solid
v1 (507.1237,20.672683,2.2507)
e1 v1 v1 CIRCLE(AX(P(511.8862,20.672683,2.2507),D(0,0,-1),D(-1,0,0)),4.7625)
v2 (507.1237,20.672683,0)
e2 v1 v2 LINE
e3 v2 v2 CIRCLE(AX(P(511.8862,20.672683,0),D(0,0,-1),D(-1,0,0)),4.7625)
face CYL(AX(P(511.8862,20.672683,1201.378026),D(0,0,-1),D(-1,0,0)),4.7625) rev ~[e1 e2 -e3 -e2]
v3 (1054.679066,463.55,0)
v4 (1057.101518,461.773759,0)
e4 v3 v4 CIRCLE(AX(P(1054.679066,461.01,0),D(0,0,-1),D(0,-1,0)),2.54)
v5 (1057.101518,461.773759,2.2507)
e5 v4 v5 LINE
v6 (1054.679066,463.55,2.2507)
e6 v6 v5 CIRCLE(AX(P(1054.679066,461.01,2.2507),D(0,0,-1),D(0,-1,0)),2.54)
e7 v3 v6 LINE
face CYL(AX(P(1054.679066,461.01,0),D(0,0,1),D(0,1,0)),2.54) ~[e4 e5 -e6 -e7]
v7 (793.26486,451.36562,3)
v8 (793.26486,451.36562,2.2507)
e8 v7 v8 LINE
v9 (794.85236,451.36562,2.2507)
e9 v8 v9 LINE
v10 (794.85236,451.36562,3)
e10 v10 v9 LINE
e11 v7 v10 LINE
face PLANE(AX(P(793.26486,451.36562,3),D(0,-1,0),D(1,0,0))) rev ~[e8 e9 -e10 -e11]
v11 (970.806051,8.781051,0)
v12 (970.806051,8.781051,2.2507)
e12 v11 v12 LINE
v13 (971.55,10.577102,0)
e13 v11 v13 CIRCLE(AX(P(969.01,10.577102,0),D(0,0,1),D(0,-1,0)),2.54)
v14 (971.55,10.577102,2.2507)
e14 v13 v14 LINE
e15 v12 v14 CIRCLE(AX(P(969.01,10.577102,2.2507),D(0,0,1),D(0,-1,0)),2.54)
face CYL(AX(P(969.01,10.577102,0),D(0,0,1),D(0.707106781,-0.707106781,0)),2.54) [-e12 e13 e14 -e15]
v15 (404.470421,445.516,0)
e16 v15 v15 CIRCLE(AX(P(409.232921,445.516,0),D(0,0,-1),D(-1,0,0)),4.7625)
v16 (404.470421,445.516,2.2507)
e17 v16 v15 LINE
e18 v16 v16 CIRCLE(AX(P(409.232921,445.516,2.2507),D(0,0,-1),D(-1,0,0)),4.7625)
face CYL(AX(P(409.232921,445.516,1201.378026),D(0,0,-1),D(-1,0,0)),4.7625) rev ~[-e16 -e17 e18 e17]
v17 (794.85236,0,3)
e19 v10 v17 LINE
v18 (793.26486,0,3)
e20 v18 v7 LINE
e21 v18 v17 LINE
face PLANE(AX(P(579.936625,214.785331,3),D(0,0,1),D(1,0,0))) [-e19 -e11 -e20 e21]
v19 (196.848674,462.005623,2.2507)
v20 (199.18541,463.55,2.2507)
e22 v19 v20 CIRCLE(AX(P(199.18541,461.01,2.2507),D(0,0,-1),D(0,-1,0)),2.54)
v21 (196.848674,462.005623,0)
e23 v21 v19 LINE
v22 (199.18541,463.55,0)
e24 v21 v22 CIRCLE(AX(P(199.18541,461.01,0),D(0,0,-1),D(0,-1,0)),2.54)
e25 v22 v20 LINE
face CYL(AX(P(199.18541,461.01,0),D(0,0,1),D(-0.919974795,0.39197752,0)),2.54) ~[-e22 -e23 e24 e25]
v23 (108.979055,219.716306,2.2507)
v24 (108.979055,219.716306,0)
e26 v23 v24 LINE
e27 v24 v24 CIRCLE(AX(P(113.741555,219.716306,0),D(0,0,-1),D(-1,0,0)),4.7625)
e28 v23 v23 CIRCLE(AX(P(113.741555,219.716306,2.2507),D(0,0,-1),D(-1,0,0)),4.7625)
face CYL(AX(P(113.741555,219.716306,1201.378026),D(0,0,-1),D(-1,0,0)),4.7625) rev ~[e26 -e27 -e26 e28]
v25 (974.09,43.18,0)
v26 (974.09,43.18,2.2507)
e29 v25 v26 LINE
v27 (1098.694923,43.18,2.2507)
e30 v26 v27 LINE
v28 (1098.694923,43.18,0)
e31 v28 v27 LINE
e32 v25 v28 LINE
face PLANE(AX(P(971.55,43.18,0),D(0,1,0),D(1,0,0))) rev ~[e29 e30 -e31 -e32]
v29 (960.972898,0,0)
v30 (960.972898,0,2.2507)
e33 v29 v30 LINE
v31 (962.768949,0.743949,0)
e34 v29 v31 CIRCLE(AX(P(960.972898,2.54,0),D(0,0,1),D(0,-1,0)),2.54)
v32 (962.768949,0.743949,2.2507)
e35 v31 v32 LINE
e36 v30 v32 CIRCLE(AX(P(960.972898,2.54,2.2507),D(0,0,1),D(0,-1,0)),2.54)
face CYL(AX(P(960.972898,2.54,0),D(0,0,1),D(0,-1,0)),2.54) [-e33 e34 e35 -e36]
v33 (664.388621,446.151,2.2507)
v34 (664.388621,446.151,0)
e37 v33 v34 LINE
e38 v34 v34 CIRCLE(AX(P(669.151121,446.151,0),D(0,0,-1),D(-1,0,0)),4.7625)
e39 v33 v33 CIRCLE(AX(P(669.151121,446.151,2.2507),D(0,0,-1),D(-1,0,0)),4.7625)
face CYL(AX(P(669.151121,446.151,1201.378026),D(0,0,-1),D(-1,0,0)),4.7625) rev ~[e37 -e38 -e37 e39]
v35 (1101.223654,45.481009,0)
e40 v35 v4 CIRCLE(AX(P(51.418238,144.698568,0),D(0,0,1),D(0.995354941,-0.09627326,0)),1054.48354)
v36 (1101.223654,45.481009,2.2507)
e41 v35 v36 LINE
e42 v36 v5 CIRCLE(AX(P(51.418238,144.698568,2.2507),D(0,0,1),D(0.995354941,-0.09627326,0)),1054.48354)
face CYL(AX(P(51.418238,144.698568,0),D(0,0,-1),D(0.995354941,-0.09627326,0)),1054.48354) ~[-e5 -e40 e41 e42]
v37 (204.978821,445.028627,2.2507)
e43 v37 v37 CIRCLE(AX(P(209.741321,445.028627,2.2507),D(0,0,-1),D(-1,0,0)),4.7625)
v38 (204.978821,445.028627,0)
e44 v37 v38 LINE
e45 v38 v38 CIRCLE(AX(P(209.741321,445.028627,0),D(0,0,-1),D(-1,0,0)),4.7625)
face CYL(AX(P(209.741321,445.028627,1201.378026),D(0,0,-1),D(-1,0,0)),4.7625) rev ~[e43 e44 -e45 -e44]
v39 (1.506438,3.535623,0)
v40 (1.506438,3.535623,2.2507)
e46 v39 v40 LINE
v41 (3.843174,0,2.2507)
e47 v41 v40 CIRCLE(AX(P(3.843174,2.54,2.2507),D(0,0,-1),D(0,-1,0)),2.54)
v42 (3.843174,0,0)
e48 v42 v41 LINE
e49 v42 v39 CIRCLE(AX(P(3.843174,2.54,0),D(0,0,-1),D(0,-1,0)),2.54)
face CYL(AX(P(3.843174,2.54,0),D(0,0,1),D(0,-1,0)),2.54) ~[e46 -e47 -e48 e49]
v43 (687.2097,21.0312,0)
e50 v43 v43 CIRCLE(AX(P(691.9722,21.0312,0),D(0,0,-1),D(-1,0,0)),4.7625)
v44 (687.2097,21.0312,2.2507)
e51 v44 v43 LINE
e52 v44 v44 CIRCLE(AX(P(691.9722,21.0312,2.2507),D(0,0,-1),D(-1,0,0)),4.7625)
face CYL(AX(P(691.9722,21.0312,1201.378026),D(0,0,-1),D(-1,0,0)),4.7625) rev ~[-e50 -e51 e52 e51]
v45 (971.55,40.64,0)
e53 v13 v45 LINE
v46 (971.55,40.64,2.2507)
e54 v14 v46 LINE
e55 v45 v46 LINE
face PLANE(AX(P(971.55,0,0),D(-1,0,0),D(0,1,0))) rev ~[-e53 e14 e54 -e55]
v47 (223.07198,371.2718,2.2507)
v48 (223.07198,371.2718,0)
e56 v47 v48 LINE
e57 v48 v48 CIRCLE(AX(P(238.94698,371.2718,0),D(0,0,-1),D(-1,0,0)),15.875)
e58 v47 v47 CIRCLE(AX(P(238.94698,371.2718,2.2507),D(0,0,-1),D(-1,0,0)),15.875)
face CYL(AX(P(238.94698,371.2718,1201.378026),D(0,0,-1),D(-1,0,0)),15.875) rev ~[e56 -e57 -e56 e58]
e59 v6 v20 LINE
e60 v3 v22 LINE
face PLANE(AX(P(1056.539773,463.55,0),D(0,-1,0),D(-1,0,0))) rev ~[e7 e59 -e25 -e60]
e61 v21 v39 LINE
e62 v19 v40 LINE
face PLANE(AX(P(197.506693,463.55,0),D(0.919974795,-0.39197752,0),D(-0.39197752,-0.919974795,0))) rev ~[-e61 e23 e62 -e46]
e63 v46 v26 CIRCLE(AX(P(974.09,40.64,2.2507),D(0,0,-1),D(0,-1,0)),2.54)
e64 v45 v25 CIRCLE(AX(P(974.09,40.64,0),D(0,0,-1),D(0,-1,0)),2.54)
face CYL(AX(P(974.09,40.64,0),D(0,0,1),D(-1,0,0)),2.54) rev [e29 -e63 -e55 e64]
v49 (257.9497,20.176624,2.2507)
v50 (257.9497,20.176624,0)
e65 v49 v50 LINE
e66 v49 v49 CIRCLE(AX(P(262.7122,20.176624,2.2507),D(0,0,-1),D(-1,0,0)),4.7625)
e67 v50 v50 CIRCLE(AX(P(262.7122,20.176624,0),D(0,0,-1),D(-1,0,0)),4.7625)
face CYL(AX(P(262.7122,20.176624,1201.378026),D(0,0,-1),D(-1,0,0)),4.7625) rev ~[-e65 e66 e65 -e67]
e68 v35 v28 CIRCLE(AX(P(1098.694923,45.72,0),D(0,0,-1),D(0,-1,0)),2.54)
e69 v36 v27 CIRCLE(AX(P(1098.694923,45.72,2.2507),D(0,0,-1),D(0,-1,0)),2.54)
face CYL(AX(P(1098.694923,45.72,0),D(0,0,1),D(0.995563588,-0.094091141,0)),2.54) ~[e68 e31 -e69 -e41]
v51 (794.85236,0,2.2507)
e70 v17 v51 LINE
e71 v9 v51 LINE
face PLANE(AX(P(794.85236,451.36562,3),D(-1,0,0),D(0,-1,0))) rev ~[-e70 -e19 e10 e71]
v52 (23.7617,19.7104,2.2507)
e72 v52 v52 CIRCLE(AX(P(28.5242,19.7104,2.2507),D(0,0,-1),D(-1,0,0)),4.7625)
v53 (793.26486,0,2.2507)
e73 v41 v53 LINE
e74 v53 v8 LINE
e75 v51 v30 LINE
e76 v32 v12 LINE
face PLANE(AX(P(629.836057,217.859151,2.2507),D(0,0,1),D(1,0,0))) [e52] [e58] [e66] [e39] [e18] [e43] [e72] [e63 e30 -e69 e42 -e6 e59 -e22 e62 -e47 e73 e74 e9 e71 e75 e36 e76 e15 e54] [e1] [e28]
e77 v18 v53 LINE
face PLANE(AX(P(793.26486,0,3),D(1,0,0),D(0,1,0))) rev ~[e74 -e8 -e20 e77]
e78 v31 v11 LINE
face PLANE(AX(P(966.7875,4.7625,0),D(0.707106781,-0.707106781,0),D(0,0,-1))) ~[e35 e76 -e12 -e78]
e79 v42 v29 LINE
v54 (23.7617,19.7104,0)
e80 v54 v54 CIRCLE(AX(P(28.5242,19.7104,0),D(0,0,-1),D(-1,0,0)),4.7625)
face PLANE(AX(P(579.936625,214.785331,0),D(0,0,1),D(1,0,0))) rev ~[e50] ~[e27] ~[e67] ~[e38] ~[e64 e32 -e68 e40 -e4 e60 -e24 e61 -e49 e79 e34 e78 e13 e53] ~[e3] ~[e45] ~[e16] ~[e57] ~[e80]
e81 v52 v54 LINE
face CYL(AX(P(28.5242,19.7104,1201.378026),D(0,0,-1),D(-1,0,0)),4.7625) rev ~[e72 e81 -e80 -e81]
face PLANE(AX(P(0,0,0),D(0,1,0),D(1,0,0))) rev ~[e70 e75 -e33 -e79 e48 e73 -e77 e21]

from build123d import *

# Parameters (mm, degrees)
F1_DEPTH = 3
F2_SIZE  = 9.525
F4_DEPTH = 0.7493
F6_D     = 9.525
F8_D     = 31.75
F9_R     = 2.54


# Not quite as in the source:
# - a length typed as a fraction of an inch, garbled in the dataset ("3 / 203.2 mm" for 3/8 in), is restored


with BuildPart() as f1:
    # F0 (on Top) → F1 (new body)
    with BuildSketch(Plane.XY):
        with BuildLine():
            Line((197.5066929404, 463.55), (0, 0))
            Line((0, 0), (971.55, 0))
            Line((971.55, 0), (971.55, 43.18))
            Line((971.55, 43.18), (1101.00364, 43.18))
            ThreePointArc((1101.00364, 43.18), (1100.0520555905, 255.6158899642), (1056.5397729404, 463.55))
            Line((1056.5397729404, 463.55), (197.5066929404, 463.55))
        make_face()
    extrude(amount=F1_DEPTH)

    # F2
    f2_edges = [f1.edges().sort_by_distance(p)[0] for p in [
        (971.55, 0, 1.5),
    ]]
    chamfer(f2_edges, length=F2_SIZE)

    # F3 (on face) → F4 (cut)
    with BuildSketch(Plane.XY.offset(3)):
        with BuildLine():
            Line((0, 0), (793.26486, 0))
            Line((793.26486, 0), (793.26486, 451.36562))
            Line((793.26486, 451.36562), (794.85236, 451.36562))
            Line((794.85236, 451.36562), (794.85236, 0))
            Line((794.85236, 0), (962.025, 0))
            Line((962.025, 0), (971.55, 9.525))
            Line((971.55, 9.525), (971.55, 43.18))
            Line((971.55, 43.18), (1101.00364, 43.18))
            ThreePointArc((1101.00364, 43.18), (1100.0520555905, 255.6158899642), (1056.5397729404, 463.55))
            Line((1056.5397729404, 463.55), (197.5066929404, 463.55))
            Line((197.5066929404, 463.55), (0, 0))
        make_face()
    extrude(amount=-F4_DEPTH, mode=Mode.SUBTRACT)

    # F6 (through all)
    with Locations(Plane.XY.offset(2.2507)):
        with Locations((209.7413209615, 445.0286267957), (409.2329209615, 445.516), (669.1511209615, 446.151), (113.7415553228, 219.7163059861), (28.5242, 19.7104), (262.7122, 20.176624196), (511.8862, 20.6726826953), (691.9722, 21.0312)):
            Hole(F6_D / 2)

    # F8 (through all)
    with Locations(Plane.XY.offset(2.2507)):
        with Locations((238.9469804498, 371.2718)):
            Hole(F8_D / 2)

    # F9
    f9_edges = [f1.edges().sort_by_distance(p)[0] for p in [
        (197.506693, 463.55, 1.12535),
        (1056.539773, 463.55, 1.12535),
        (1101.00364, 43.18, 1.12535),
        (971.55, 43.18, 1.12535),
        (971.55, 9.525, 1.12535),
        (962.025, 0, 1.12535),
        (0, 0, 1.12535),
    ]]
    fillet(f9_edges, radius=F9_R)


solid = f1.part
